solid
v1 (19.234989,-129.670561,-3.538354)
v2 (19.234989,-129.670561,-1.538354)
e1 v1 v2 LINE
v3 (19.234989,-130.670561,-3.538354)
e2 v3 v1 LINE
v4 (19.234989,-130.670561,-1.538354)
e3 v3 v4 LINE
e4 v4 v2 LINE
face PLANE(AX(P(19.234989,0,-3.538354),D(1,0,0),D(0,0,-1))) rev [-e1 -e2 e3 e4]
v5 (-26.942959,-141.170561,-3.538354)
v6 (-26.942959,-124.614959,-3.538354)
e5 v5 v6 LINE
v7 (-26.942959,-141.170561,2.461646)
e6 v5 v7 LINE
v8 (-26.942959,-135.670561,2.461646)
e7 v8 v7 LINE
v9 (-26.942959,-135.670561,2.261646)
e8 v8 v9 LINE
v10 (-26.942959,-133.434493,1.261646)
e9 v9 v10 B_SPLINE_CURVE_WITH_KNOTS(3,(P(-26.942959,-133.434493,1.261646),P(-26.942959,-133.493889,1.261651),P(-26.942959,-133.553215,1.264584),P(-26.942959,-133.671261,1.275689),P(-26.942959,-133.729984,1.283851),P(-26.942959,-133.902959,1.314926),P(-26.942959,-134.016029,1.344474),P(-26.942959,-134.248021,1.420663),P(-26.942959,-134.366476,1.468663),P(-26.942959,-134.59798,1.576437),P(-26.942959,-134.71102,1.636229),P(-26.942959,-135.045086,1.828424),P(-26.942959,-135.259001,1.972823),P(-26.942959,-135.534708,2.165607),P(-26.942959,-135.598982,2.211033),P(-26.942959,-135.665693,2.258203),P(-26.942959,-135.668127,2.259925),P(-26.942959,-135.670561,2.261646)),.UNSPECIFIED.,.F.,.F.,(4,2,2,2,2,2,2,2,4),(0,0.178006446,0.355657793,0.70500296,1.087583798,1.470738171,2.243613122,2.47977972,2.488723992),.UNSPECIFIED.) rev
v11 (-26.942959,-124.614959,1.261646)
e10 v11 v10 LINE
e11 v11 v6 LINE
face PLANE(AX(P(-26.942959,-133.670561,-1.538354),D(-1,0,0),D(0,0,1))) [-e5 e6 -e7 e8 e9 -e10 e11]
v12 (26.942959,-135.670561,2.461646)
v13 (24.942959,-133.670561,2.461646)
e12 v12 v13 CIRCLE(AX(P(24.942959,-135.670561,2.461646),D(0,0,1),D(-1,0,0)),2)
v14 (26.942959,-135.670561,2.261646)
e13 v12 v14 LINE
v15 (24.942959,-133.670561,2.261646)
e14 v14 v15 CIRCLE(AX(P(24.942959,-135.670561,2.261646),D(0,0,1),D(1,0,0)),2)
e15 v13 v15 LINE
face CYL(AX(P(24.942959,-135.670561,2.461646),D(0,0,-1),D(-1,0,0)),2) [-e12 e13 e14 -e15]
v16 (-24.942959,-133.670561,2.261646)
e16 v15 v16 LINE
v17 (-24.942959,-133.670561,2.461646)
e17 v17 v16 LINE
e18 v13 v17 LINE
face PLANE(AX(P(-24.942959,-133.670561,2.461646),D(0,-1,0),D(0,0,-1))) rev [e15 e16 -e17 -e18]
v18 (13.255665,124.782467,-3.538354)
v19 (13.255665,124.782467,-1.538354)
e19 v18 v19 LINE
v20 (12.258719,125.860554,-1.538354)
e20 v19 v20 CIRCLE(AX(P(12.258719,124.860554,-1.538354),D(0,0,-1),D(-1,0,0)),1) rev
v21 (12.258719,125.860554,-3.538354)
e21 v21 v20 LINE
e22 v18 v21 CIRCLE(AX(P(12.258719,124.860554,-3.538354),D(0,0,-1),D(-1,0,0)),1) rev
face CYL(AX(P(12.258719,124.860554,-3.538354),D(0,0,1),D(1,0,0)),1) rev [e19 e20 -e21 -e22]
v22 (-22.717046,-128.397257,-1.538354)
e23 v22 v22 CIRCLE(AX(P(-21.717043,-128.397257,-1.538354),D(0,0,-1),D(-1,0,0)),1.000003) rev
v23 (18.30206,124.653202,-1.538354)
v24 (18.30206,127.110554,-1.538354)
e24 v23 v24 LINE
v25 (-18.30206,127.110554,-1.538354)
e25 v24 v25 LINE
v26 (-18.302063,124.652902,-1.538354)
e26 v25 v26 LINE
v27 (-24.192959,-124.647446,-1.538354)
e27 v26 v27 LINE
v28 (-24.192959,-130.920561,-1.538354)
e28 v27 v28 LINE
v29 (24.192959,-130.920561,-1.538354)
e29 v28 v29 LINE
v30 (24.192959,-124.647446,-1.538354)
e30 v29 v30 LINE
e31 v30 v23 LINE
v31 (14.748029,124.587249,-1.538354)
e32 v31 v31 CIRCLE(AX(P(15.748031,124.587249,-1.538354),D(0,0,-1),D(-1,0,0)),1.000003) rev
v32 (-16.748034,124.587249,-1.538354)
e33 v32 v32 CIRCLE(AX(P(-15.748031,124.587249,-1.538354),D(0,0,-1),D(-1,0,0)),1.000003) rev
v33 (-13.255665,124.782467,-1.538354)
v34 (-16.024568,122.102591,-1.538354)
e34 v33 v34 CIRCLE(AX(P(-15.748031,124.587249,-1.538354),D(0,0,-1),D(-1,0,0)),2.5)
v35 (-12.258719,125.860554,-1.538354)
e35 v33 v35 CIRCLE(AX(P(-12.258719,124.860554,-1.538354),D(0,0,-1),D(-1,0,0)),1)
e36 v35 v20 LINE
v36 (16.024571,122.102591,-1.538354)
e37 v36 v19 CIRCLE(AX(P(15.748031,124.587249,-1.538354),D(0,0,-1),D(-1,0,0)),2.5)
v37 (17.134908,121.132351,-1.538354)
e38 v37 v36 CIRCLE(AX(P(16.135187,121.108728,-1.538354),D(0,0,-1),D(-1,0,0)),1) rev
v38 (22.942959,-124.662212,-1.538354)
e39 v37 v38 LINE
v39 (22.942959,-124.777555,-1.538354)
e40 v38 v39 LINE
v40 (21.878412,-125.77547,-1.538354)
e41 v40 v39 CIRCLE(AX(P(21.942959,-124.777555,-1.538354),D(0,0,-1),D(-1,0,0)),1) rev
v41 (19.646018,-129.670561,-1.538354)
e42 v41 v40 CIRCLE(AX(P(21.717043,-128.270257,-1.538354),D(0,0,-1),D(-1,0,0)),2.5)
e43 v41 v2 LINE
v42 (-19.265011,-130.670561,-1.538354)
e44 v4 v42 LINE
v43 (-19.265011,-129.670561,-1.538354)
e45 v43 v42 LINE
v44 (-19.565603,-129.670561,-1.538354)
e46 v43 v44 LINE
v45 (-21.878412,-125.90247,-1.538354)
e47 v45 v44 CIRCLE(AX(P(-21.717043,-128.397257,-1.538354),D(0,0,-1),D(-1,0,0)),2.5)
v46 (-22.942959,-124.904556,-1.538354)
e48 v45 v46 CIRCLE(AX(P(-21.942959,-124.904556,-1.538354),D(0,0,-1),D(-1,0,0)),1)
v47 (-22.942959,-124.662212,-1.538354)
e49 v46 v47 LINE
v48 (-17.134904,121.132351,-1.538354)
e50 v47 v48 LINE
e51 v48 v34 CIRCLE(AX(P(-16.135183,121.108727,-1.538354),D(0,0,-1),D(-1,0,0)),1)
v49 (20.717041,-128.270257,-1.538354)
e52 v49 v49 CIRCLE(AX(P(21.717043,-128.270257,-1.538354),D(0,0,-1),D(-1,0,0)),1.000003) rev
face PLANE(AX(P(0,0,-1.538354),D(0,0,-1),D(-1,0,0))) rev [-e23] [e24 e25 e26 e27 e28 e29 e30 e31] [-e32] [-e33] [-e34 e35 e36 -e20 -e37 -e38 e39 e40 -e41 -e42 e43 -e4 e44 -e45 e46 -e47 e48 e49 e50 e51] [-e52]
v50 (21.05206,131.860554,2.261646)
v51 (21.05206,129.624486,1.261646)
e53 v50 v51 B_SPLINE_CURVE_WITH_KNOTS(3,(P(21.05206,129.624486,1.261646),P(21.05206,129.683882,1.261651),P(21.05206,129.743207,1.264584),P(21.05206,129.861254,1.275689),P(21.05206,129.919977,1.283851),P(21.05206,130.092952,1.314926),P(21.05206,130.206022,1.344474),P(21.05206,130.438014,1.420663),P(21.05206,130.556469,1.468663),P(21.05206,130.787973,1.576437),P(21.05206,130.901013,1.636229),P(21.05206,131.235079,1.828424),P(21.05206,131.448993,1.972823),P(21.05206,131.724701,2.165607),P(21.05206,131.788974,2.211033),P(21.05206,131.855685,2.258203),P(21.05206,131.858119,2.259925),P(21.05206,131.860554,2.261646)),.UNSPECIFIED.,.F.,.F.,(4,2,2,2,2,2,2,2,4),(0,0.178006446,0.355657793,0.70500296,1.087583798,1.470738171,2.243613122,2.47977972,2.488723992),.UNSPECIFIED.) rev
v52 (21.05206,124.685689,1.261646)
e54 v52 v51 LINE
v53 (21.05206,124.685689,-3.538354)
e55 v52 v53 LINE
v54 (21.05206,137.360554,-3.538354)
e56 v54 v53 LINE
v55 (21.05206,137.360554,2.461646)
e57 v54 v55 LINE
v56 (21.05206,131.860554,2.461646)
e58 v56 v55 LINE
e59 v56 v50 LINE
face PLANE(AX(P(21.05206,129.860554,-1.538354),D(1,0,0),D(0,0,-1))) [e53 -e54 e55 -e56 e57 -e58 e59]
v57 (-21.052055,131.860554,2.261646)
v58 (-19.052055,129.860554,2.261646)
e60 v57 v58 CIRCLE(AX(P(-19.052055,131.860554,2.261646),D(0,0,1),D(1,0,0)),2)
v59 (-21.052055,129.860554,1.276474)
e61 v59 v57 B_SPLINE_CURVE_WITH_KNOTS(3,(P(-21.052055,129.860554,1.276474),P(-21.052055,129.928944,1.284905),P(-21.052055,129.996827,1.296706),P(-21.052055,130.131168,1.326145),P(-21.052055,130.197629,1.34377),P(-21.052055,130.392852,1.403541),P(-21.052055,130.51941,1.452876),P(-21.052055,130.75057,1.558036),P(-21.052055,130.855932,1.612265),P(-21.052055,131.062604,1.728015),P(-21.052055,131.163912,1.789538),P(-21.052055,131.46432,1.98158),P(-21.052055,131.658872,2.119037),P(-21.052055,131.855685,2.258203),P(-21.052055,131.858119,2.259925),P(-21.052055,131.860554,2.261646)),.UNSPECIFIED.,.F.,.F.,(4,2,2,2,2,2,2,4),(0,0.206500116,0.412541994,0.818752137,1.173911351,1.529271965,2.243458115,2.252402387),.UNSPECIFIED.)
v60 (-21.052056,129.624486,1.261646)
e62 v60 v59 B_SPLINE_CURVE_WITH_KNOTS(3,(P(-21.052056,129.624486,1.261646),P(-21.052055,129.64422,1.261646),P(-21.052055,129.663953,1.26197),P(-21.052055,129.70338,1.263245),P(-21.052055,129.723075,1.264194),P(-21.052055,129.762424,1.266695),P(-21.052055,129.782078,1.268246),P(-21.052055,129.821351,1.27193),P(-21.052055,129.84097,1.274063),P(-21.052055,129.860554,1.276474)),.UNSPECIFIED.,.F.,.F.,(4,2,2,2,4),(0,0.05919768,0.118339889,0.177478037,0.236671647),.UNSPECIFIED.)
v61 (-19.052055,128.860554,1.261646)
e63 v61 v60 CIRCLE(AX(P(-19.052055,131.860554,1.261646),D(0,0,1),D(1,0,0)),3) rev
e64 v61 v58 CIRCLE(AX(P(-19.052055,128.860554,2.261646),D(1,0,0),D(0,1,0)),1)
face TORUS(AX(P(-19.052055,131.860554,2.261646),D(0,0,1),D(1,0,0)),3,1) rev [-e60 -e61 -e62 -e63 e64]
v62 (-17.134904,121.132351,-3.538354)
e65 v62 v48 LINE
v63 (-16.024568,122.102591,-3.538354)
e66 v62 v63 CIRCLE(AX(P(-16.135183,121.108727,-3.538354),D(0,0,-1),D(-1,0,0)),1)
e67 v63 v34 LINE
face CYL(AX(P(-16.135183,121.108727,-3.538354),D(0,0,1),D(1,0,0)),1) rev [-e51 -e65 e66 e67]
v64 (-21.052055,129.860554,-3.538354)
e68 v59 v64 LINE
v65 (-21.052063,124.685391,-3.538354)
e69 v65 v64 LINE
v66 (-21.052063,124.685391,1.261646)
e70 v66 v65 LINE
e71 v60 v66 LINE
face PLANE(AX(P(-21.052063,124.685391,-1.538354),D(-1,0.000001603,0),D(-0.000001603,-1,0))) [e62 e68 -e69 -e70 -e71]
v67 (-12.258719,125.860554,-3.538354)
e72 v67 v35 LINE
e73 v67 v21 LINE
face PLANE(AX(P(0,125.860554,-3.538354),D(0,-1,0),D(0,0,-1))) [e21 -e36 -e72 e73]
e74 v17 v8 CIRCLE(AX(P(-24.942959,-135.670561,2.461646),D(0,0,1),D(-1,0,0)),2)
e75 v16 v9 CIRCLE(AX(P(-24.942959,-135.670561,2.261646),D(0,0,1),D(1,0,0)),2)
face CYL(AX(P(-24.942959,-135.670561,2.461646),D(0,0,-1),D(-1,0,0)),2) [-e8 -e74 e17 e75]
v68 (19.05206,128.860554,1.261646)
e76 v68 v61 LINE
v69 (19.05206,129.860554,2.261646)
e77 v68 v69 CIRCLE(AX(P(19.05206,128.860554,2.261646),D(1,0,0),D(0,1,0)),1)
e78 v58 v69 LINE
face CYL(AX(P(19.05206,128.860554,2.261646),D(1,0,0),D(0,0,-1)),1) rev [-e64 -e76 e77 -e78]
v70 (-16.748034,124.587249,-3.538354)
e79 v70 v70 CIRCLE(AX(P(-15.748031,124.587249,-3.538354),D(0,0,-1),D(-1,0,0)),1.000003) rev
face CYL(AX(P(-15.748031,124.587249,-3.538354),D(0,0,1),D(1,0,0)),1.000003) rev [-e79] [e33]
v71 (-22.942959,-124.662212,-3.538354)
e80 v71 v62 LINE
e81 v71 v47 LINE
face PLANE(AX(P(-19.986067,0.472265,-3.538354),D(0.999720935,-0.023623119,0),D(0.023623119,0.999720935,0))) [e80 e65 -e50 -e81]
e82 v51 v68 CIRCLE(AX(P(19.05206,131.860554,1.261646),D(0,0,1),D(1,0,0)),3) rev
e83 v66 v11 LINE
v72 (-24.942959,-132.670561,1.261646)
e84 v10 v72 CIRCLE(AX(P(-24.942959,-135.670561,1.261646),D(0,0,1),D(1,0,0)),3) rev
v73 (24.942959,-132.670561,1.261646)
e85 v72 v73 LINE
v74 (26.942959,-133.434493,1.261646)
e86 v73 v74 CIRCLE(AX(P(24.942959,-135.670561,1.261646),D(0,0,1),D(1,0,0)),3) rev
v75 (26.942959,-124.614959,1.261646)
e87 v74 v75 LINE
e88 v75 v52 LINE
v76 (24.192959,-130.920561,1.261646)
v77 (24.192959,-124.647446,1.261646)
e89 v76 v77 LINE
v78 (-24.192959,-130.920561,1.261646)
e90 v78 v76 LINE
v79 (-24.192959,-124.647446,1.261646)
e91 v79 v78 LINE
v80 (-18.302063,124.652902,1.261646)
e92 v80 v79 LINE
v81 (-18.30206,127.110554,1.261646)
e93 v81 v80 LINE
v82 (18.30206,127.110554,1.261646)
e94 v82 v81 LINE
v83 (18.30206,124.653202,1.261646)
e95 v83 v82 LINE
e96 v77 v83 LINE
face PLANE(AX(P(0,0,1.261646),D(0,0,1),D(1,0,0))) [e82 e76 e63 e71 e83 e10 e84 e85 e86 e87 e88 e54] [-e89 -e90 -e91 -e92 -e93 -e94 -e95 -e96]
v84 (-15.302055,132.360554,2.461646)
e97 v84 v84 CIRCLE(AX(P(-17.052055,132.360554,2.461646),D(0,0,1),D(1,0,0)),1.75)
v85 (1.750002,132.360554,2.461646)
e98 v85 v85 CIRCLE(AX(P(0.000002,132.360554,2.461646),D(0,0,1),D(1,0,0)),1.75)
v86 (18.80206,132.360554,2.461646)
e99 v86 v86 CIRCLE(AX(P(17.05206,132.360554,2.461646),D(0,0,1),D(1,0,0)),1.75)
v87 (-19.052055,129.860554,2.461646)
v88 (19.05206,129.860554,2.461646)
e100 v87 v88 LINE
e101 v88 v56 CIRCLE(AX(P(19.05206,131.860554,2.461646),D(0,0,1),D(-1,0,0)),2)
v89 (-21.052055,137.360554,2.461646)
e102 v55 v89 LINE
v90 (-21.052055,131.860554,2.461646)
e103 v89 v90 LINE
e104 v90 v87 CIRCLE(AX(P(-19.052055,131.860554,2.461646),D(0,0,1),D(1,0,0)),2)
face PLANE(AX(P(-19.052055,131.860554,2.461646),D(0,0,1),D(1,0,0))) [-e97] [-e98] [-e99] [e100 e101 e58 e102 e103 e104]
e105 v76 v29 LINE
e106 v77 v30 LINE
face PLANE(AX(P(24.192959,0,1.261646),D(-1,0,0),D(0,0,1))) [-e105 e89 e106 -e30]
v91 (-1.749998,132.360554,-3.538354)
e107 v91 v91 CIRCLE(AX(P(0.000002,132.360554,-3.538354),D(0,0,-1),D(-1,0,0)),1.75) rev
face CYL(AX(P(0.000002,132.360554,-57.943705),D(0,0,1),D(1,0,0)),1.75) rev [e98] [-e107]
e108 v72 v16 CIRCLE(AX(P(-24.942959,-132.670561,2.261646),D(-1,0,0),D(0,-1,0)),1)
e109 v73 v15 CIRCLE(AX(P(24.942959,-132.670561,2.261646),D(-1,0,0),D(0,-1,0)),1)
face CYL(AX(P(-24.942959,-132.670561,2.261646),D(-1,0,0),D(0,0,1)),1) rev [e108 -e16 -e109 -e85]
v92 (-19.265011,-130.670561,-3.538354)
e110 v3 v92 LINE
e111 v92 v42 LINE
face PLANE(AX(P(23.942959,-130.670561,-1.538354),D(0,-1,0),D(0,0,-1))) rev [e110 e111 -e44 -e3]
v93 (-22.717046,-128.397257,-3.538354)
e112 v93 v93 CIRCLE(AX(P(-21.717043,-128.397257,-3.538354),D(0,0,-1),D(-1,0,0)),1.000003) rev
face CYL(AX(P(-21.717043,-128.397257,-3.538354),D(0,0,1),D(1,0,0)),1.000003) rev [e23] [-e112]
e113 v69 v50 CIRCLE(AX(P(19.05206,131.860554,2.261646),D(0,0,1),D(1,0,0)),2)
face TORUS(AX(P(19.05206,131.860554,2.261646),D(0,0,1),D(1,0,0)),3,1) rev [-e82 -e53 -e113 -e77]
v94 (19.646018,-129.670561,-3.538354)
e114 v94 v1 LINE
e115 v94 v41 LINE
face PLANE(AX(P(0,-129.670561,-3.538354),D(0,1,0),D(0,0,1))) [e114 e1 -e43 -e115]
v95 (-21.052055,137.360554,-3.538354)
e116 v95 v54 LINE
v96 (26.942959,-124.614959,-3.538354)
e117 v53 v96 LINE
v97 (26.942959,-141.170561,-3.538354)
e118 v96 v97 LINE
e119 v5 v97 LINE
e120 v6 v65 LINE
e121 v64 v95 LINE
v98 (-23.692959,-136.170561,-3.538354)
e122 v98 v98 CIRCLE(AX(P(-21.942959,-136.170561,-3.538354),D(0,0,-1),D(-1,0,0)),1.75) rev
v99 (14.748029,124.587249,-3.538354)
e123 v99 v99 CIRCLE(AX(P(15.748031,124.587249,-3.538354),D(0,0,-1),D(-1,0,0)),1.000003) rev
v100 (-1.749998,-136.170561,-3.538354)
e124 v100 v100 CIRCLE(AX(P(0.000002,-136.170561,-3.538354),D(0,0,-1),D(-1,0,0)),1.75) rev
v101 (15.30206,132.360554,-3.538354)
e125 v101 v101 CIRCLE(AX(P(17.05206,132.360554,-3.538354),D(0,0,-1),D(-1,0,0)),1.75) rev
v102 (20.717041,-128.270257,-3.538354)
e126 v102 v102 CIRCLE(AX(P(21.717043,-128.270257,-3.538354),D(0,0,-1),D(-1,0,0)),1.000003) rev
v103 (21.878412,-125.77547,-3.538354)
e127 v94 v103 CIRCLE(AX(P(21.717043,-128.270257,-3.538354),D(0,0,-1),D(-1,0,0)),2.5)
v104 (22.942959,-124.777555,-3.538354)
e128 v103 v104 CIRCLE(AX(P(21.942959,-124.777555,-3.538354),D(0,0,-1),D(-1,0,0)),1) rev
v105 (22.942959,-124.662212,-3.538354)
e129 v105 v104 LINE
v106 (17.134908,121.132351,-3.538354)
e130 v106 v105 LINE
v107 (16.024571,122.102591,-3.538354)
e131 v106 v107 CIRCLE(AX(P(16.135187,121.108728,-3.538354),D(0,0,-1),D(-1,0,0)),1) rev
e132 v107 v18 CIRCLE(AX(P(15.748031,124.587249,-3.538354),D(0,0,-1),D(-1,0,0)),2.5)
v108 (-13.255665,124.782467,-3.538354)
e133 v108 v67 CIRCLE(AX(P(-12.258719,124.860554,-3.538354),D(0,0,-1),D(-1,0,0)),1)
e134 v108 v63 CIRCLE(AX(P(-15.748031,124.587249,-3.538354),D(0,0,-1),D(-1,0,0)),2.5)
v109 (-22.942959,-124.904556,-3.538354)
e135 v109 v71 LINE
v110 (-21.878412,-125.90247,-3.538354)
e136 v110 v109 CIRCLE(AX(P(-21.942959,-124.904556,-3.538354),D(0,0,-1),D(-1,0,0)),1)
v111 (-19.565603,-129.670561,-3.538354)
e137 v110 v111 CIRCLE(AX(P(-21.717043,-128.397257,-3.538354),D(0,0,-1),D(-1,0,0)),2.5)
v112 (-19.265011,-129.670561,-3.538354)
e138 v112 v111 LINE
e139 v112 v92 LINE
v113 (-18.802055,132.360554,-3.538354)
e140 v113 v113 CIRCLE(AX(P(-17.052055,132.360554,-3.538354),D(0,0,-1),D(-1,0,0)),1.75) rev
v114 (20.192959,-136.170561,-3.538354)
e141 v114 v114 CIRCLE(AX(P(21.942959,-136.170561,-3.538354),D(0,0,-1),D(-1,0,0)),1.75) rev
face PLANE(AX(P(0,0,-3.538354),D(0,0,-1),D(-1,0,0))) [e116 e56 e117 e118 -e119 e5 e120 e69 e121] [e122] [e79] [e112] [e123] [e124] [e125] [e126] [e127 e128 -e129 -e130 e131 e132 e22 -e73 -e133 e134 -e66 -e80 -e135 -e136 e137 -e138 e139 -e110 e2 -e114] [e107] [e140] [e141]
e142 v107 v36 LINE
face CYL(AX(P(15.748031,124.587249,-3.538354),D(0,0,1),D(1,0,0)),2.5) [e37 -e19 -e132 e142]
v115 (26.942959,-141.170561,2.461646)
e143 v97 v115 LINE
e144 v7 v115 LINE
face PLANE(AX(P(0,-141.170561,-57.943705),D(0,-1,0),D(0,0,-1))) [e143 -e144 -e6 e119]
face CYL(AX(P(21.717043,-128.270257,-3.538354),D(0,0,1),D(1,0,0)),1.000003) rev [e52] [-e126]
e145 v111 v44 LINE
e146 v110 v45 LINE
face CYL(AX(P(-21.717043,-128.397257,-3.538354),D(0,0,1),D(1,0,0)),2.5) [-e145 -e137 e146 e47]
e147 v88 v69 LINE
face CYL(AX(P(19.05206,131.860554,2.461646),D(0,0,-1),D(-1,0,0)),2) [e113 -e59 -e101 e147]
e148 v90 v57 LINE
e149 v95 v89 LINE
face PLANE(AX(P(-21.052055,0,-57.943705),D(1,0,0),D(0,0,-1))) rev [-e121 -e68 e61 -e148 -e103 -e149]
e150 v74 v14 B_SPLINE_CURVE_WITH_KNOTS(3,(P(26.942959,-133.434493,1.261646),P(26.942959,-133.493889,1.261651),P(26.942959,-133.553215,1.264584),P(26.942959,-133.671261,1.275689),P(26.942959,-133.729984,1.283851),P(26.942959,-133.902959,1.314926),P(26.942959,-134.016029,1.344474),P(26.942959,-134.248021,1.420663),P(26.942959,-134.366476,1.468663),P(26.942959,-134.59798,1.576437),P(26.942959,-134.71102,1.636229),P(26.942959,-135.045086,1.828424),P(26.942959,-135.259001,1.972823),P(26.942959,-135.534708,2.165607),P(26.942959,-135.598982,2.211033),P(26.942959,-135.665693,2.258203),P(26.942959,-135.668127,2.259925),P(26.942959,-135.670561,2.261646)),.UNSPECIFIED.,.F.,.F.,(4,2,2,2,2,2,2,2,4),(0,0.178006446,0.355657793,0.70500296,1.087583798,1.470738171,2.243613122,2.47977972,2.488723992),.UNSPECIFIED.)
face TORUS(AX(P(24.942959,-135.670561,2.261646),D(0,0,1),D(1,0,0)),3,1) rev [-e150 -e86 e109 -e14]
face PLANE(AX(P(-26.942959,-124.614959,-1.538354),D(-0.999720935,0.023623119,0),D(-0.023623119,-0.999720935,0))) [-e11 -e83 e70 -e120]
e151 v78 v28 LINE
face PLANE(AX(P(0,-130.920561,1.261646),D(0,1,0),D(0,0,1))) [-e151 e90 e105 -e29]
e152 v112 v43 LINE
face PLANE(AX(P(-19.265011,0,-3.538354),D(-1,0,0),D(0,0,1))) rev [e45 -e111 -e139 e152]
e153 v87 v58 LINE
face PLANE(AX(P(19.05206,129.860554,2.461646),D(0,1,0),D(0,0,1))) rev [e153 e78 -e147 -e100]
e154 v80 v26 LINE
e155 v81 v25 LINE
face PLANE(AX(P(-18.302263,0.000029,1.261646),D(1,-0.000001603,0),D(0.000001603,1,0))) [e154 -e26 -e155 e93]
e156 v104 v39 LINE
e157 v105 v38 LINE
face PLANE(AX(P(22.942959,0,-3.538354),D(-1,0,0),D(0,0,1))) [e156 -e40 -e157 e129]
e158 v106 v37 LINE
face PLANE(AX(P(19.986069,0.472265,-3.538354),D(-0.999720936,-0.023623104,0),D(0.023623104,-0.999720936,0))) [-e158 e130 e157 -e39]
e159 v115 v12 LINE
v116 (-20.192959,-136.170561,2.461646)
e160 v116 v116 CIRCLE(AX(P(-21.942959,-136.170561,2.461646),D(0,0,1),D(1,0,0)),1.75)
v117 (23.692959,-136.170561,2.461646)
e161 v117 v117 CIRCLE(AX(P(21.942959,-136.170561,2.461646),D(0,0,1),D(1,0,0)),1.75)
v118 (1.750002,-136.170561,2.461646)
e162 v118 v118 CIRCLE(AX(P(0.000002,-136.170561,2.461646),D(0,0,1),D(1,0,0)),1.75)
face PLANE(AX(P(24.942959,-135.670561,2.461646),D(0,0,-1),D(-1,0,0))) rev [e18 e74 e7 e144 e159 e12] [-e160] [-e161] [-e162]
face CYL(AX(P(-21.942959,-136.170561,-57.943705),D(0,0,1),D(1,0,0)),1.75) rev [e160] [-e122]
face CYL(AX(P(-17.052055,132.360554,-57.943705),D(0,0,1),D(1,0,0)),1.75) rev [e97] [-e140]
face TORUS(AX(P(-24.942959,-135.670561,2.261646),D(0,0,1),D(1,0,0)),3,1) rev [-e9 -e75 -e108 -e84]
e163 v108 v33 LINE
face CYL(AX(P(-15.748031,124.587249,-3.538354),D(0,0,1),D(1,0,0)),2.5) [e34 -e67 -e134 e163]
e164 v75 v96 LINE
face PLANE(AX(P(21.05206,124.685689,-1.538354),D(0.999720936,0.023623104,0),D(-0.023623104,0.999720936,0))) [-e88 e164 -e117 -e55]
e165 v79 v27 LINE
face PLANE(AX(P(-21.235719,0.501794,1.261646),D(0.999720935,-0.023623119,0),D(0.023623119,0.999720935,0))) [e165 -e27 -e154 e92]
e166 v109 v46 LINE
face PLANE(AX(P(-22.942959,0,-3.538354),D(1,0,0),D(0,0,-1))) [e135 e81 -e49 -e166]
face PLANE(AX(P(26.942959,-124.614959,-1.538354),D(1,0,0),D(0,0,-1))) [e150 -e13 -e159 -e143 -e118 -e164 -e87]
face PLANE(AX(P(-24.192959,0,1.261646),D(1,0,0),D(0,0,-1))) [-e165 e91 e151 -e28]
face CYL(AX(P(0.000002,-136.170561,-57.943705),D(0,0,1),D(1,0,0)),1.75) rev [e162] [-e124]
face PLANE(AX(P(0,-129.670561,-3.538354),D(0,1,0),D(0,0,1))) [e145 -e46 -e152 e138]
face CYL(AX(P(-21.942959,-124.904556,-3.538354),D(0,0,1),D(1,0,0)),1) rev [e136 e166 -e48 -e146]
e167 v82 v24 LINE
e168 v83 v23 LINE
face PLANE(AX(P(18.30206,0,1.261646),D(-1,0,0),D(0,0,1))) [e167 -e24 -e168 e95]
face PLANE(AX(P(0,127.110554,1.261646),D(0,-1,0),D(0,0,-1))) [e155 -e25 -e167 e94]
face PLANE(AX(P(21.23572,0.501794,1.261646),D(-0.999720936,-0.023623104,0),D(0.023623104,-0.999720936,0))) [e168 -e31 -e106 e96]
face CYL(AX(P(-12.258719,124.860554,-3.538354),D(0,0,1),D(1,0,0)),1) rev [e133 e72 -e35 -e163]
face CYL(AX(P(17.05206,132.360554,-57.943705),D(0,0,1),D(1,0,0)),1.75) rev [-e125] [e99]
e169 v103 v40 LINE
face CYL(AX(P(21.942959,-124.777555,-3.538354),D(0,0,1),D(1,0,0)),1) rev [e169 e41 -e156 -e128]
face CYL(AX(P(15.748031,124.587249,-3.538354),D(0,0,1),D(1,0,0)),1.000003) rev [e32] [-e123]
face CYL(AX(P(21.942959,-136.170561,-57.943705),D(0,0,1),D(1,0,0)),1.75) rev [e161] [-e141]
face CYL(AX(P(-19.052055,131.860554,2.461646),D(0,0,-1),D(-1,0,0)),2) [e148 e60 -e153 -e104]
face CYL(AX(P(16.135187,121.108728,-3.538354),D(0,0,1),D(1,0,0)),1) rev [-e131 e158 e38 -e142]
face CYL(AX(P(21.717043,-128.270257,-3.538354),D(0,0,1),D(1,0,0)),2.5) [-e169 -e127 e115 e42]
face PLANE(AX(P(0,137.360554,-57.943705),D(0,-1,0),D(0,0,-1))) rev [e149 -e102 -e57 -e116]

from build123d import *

# Parameters (mm, degrees)
SKETCH_2_R      = 1
EXTRUDE_1_DEPTH = 2
EXTRUDE_2_DEPTH = 2
EXTRUDE_3_DEPTH = 2.8
SKETCH_5_R      = 1.75
EXTRUDE_4_DEPTH = 4.8
EXTRUDE_START   = 1.2
SKETCH_6_R      = 1.75
EXTRUDE_5_DEPTH = 1.2
FILLET_1_R      = 1


with BuildPart() as part:
    # 草图2 → 凸台-拉伸1 (new body)
    with BuildSketch(Plane(origin=(0, 0, -1.538354077), x_dir=(-1, 0, 0), z_dir=(0, 0, -1))):
        with BuildLine():
            Line((-22.942959106, -124.662212149), (-17.134907671, 121.132350923))
            ThreePointArc((-17.134907671, 121.132350923), (-16.793190136, 121.861742775), (-16.024570953, 122.102591063))
            ThreePointArc((-16.024570953, 122.102591063), (-14.009380987, 122.790837638), (-13.255665128, 124.782466708))
            ThreePointArc((-13.255665128, 124.782466708), (-12.992914403, 125.539491489), (-12.25871858, 125.860553721))
            Line((-12.25871858, 125.860553721), (12.25871858, 125.860553721))
            ThreePointArc((12.25871858, 125.860553721), (12.992914403, 125.539491489), (13.255665128, 124.782466708))
            ThreePointArc((13.255665128, 124.782466708), (14.009380087, 122.79083851), (16.024568463, 122.102590786))
            ThreePointArc((16.024568463, 122.102590786), (16.793187022, 121.861742062), (17.134904184, 121.13235055))
            Line((17.134904184, 121.13235055), (22.942959106, -124.662212156))
            Line((22.942959106, -124.662212156), (22.942959106, -124.904555532))
            ThreePointArc((22.942959106, -124.904555532), (22.626864313, -125.634126411), (21.878411771, -125.902470178))
            ThreePointArc((21.878411771, -125.902470178), (19.586380534, -127.089481736), (19.565603095, -129.670561341))
            Line((19.565603095, -129.670561341), (19.265011022, -129.670561341))
            Line((19.265011022, -129.670561341), (19.265011022, -130.670561341))
            Line((19.265011022, -130.670561341), (23.942959106, -130.670561341))
            Line((23.942959106, -130.670561341), (23.942959106, -124.650398948))
            Line((23.942959106, -124.650398948), (18.052063488, 124.649948906))
            Line((18.052063488, 124.649948906), (18.052059944, 126.860553721))
            Line((18.052059944, 126.860553721), (-18.052059944, 126.860553721))
            Line((-18.052059944, 126.860553721), (-18.052059944, 124.65024892))
            Line((-18.052059944, 124.65024892), (-23.942959106, -124.650398948))
            Line((-23.942959106, -124.650398948), (-23.942959106, -130.670561341))
            Line((-23.942959106, -130.670561341), (-19.234988978, -130.670561341))
            Line((-19.234988978, -130.670561341), (-19.234988978, -129.670561341))
            Line((-19.234988978, -129.670561341), (-19.646017972, -129.670561341))
            ThreePointArc((-19.646017972, -129.670561341), (-19.548027097, -127.027128176), (-21.878411771, -125.775469924))
            ThreePointArc((-21.878411771, -125.775469924), (-22.626864313, -125.507126157), (-22.942959106, -124.777555278))
            Line((-22.942959106, -124.777555278), (-22.942959106, -124.662212149))
        make_face()
        with Locations((-21.717043434, -128.270256541)):
            Circle(SKETCH_2_R, mode=Mode.SUBTRACT)
        with Locations((21.717043434, -128.397256794)):
            Circle(SKETCH_2_R, mode=Mode.SUBTRACT)
        with Locations((-15.748031496, 124.587249174)):
            Circle(SKETCH_2_R, mode=Mode.SUBTRACT)
        with Locations((15.748031496, 124.587249174)):
            Circle(SKETCH_2_R, mode=Mode.SUBTRACT)
    extrude(amount=EXTRUDE_1_DEPTH)

    # 草图3 → 凸台-拉伸2 (add)
    with BuildSketch(Plane(origin=(0, 0, -3.538354077), x_dir=(-1, 0, 0), z_dir=(0, 0, -1))):
        Polygon((26.942959106, -124.614959326), (21.052063431, 124.685390934), (21.052055134, 129.860553721), (-21.052059944, 129.860553721), (-21.052059944, 124.685688522), (-26.942959106, -124.614959347), (-26.942959106, -133.670561341), (26.942959106, -133.670561341), align=None)
        Polygon((18.052059944, 126.860553721), (-18.052059944, 126.860553721), (-18.052059944, 124.65024892), (-23.942959106, -124.650398948), (-23.942959106, -130.670561341), (23.942959106, -130.670561341), (23.942959106, -124.650398948), (18.052063488, 124.649948906), align=None, mode=Mode.SUBTRACT)
    extrude(amount=-EXTRUDE_2_DEPTH)

    # 草图4 → 凸台-拉伸3 (add)
    with BuildSketch(Plane.XY.offset(-1.538354077)):
        Polygon((-21.052063431, 124.685390934), (-26.942959106, -124.614959326), (-26.942959106, -133.670561341), (26.942959106, -133.670561341), (26.942959106, -124.614959347), (21.052059944, 124.685688522), (21.052059944, 129.860553721), (-21.052055134, 129.860553721), align=None)
        Polygon((-18.302059543, 127.110553721), (-18.302063484, 124.652902409), (-24.192959106, -124.647445647), (-24.192959106, -130.920561341), (24.192959106, -130.920561341), (24.192959106, -124.647445648), (18.302059944, 124.653202221), (18.302059944, 127.110553721), align=None, mode=Mode.SUBTRACT)
    extrude(amount=EXTRUDE_3_DEPTH)

    # 草图5 → 凸台-拉伸4 (add)
    # profile 1 of 2: a face of its own
    with BuildSketch(Plane.XY.offset(1.261645923)):
        Polygon((-26.942959106, -133.670561341), (26.942959106, -133.670561341), (26.942959106, -138.670561341), (26.942959106, -141.170561341), (-26.942959106, -141.170561341), (-26.942959106, -138.670561341), align=None)
        with Locations((2.405e-06, -136.170561341)):
            Circle(SKETCH_5_R, mode=Mode.SUBTRACT)
        with Locations((21.942959106, -136.170561341)):
            Circle(SKETCH_5_R, mode=Mode.SUBTRACT)
        with Locations((-21.942959106, -136.170561341)):
            Circle(SKETCH_5_R, mode=Mode.SUBTRACT)
    # profile 2 of 2: a face of its own
    with BuildSketch(Plane.XY.offset(1.261645923)):
        Polygon((21.052059944, 129.860553721), (-21.052055134, 129.860553721), (-21.052055134, 134.860553721), (-21.052055134, 137.360553721), (21.052059944, 137.360553721), (21.052059944, 134.860553721), align=None)
        with Locations((-17.052055134, 132.360553721)):
            Circle(SKETCH_5_R, mode=Mode.SUBTRACT)
        with Locations((17.052059944, 132.360553721)):
            Circle(SKETCH_5_R, mode=Mode.SUBTRACT)
        with Locations((2.405e-06, 132.360553721)):
            Circle(SKETCH_5_R, mode=Mode.SUBTRACT)
    extrude(amount=-EXTRUDE_4_DEPTH)

    # 草图6 → 凸台-拉伸5 (add)
    # profile 1 of 2: a face of its own
    with BuildSketch(Plane.XY.offset(1.261645923).offset(EXTRUDE_START)):
        with BuildLine():
            Line((-26.942959106, -138.670561341), (-26.942959106, -141.170561341))
            Line((-26.942959106, -141.170561341), (26.942959106, -141.170561341))
            Line((26.942959106, -141.170561341), (26.942959106, -138.670561341))
            Line((26.942959106, -138.670561341), (26.942959106, -135.670561341))
            ThreePointArc((26.942959106, -135.670561341), (26.357172668, -134.256347779), (24.942959106, -133.670561341))
            Line((24.942959106, -133.670561341), (-24.942959106, -133.670561341))
            ThreePointArc((-24.942959106, -133.670561341), (-26.357172668, -134.256347779), (-26.942959106, -135.670561341))
            Line((-26.942959106, -135.670561341), (-26.942959106, -138.670561341))
        make_face()
        with Locations((21.942959106, -136.170561341)):
            Circle(SKETCH_6_R, mode=Mode.SUBTRACT)
        with Locations((2.405e-06, -136.170561341)):
            Circle(SKETCH_6_R, mode=Mode.SUBTRACT)
        with Locations((-21.942959106, -136.170561341)):
            Circle(SKETCH_6_R, mode=Mode.SUBTRACT)
    # profile 2 of 2: a face of its own
    with BuildSketch(Plane.XY.offset(1.261645923).offset(EXTRUDE_START)):
        with BuildLine():
            Line((21.052059944, 131.860553721), (21.052059944, 134.860553721))
            Line((21.052059944, 134.860553721), (21.052059944, 137.360553721))
            Line((21.052059944, 137.360553721), (-21.052055134, 137.360553721))
            Line((-21.052055134, 137.360553721), (-21.052055134, 134.860553721))
            Line((-21.052055134, 134.860553721), (-21.052055134, 131.860553721))
            ThreePointArc((-21.052055134, 131.860553721), (-20.466268697, 130.446340159), (-19.052055134, 129.860553721))
            Line((-19.052055134, 129.860553721), (19.052059944, 129.860553721))
            ThreePointArc((19.052059944, 129.860553721), (20.466273506, 130.446340159), (21.052059944, 131.860553721))
        make_face()
        with Locations((17.052059944, 132.360553721)):
            Circle(SKETCH_6_R, mode=Mode.SUBTRACT)
        with Locations((2.405e-06, 132.360553721)):
            Circle(SKETCH_6_R, mode=Mode.SUBTRACT)
        with Locations((-17.052055134, 132.360553721)):
            Circle(SKETCH_6_R, mode=Mode.SUBTRACT)
    extrude(amount=-EXTRUDE_5_DEPTH)

    # 圆角1
    # the kernel refuses this fillet: 1 mm, written as the material it adds along each edge
    with BuildSketch(Plane(origin=(24.942959106, -135.670561341, 1.261645923), x_dir=(0.31484580408697693, -0.9491428341660831, 0), z_dir=(-0.9491428341660831, -0.31484580408697693, 0))) as fillet_1_piece_1_section:
        with BuildLine():
            CenterArc((2 + FILLET_1_R, FILLET_1_R), FILLET_1_R, 180, 90)
            Line((2, FILLET_1_R), (2, 0))
            Line((2, 0), (2 + FILLET_1_R, 0))
        make_face()
    fillet_1_piece_1 = revolve(axis=Axis((24.942959106, -135.670561341, 1.261645923), (0, 0, 1)), revolution_arc=161.648494619, mode=Mode.PRIVATE)
    fillet_1_piece_1 = split(fillet_1_piece_1, bisect_by=Plane(origin=(26.942959106, -134.20836544, 1.533797611), z_dir=(-1, 0, 0)), keep=Keep.TOP, mode=Mode.PRIVATE)
    add(fillet_1_piece_1)
    with BuildSketch(Plane(origin=(-24.942959106, -135.670561341, 1.261645923), x_dir=(0, 1, 0), z_dir=(1, 0, 0))) as fillet_1_piece_2_section:
        with BuildLine():
            CenterArc((2 + FILLET_1_R, FILLET_1_R), FILLET_1_R, 180, 90)
            Line((2 + FILLET_1_R, 0), (2, 0))
            Line((2, 0), (2, FILLET_1_R))
        make_face()
    fillet_1_piece_2 = revolve(axis=Axis((-24.942959106, -135.670561341, 1.261645923), (0, 0, 1)), revolution_arc=161.648494619, mode=Mode.PRIVATE)
    fillet_1_piece_2 = split(fillet_1_piece_2, bisect_by=Plane(origin=(-26.942959106, -134.20836489, 1.533796612), z_dir=(1, 0, 0)), keep=Keep.TOP, mode=Mode.PRIVATE)
    add(fillet_1_piece_2)
    with BuildSketch(Plane(origin=(-19.052055134, 131.860553721, 1.261645923), x_dir=(-0.31484580408698715, 0.9491428341660799, 0), z_dir=(0.9491428341660799, 0.31484580408698715, 0))) as fillet_1_piece_3_section:
        with BuildLine():
            CenterArc((2 + FILLET_1_R, FILLET_1_R), FILLET_1_R, 180, 90)
            Line((2, FILLET_1_R), (2, 0))
            Line((2, 0), (2 + FILLET_1_R, 0))
        make_face()
    fillet_1_piece_3 = revolve(axis=Axis((-19.052055134, 131.860553721, 1.261645923), (0, 0, 1)), revolution_arc=161.648494619, mode=Mode.PRIVATE)
    fillet_1_piece_3 = split(fillet_1_piece_3, bisect_by=Plane(origin=(-21.052055134, 130.742519817, 1.42831269), z_dir=(1, 0, 0)), keep=Keep.TOP, mode=Mode.PRIVATE)
    add(fillet_1_piece_3)
    with BuildSketch(Plane(origin=(19.052059944, 131.860553721, 1.261645923), x_dir=(0, -1, 0), z_dir=(-1, 0, 0))) as fillet_1_piece_4_section:
        with BuildLine():
            CenterArc((2 + FILLET_1_R, FILLET_1_R), FILLET_1_R, 180, 90)
            Line((2, FILLET_1_R), (2, 0))
            Line((2, 0), (2 + FILLET_1_R, 0))
        make_face()
    fillet_1_piece_4 = revolve(axis=Axis((19.052059944, 131.860553721, 1.261645923), (0, 0, 1)), revolution_arc=161.648494619, mode=Mode.PRIVATE)
    fillet_1_piece_4 = split(fillet_1_piece_4, bisect_by=Plane(origin=(21.052059944, 129.648450881, 1.424284575), z_dir=(-1, 0, 0)), keep=Keep.TOP, mode=Mode.PRIVATE)
    add(fillet_1_piece_4)
    with BuildSketch(Plane(origin=(24.942959106, -133.670561341, 1.261645923), x_dir=(0, 1, 0), z_dir=(-1, 0, 0))) as fillet_1_piece_5:
        with BuildLine():
            CenterArc((FILLET_1_R, -FILLET_1_R), FILLET_1_R, 90, 90)
            Line((0, -FILLET_1_R), (0, 0))
            Line((0, 0), (FILLET_1_R, 0))
        make_face()
    extrude(amount=49.885918212)
    with BuildSketch(Plane(origin=(-19.052055134, 129.860553721, 1.261645923), x_dir=(0, -1, 0), z_dir=(1, 0, 0))) as fillet_1_piece_6:
        with BuildLine():
            CenterArc((FILLET_1_R, -FILLET_1_R), FILLET_1_R, 90, 90)
            Line((0, -FILLET_1_R), (0, 0))
            Line((0, 0), (FILLET_1_R, 0))
        make_face()
    extrude(amount=38.104115079)


solid = part.part
